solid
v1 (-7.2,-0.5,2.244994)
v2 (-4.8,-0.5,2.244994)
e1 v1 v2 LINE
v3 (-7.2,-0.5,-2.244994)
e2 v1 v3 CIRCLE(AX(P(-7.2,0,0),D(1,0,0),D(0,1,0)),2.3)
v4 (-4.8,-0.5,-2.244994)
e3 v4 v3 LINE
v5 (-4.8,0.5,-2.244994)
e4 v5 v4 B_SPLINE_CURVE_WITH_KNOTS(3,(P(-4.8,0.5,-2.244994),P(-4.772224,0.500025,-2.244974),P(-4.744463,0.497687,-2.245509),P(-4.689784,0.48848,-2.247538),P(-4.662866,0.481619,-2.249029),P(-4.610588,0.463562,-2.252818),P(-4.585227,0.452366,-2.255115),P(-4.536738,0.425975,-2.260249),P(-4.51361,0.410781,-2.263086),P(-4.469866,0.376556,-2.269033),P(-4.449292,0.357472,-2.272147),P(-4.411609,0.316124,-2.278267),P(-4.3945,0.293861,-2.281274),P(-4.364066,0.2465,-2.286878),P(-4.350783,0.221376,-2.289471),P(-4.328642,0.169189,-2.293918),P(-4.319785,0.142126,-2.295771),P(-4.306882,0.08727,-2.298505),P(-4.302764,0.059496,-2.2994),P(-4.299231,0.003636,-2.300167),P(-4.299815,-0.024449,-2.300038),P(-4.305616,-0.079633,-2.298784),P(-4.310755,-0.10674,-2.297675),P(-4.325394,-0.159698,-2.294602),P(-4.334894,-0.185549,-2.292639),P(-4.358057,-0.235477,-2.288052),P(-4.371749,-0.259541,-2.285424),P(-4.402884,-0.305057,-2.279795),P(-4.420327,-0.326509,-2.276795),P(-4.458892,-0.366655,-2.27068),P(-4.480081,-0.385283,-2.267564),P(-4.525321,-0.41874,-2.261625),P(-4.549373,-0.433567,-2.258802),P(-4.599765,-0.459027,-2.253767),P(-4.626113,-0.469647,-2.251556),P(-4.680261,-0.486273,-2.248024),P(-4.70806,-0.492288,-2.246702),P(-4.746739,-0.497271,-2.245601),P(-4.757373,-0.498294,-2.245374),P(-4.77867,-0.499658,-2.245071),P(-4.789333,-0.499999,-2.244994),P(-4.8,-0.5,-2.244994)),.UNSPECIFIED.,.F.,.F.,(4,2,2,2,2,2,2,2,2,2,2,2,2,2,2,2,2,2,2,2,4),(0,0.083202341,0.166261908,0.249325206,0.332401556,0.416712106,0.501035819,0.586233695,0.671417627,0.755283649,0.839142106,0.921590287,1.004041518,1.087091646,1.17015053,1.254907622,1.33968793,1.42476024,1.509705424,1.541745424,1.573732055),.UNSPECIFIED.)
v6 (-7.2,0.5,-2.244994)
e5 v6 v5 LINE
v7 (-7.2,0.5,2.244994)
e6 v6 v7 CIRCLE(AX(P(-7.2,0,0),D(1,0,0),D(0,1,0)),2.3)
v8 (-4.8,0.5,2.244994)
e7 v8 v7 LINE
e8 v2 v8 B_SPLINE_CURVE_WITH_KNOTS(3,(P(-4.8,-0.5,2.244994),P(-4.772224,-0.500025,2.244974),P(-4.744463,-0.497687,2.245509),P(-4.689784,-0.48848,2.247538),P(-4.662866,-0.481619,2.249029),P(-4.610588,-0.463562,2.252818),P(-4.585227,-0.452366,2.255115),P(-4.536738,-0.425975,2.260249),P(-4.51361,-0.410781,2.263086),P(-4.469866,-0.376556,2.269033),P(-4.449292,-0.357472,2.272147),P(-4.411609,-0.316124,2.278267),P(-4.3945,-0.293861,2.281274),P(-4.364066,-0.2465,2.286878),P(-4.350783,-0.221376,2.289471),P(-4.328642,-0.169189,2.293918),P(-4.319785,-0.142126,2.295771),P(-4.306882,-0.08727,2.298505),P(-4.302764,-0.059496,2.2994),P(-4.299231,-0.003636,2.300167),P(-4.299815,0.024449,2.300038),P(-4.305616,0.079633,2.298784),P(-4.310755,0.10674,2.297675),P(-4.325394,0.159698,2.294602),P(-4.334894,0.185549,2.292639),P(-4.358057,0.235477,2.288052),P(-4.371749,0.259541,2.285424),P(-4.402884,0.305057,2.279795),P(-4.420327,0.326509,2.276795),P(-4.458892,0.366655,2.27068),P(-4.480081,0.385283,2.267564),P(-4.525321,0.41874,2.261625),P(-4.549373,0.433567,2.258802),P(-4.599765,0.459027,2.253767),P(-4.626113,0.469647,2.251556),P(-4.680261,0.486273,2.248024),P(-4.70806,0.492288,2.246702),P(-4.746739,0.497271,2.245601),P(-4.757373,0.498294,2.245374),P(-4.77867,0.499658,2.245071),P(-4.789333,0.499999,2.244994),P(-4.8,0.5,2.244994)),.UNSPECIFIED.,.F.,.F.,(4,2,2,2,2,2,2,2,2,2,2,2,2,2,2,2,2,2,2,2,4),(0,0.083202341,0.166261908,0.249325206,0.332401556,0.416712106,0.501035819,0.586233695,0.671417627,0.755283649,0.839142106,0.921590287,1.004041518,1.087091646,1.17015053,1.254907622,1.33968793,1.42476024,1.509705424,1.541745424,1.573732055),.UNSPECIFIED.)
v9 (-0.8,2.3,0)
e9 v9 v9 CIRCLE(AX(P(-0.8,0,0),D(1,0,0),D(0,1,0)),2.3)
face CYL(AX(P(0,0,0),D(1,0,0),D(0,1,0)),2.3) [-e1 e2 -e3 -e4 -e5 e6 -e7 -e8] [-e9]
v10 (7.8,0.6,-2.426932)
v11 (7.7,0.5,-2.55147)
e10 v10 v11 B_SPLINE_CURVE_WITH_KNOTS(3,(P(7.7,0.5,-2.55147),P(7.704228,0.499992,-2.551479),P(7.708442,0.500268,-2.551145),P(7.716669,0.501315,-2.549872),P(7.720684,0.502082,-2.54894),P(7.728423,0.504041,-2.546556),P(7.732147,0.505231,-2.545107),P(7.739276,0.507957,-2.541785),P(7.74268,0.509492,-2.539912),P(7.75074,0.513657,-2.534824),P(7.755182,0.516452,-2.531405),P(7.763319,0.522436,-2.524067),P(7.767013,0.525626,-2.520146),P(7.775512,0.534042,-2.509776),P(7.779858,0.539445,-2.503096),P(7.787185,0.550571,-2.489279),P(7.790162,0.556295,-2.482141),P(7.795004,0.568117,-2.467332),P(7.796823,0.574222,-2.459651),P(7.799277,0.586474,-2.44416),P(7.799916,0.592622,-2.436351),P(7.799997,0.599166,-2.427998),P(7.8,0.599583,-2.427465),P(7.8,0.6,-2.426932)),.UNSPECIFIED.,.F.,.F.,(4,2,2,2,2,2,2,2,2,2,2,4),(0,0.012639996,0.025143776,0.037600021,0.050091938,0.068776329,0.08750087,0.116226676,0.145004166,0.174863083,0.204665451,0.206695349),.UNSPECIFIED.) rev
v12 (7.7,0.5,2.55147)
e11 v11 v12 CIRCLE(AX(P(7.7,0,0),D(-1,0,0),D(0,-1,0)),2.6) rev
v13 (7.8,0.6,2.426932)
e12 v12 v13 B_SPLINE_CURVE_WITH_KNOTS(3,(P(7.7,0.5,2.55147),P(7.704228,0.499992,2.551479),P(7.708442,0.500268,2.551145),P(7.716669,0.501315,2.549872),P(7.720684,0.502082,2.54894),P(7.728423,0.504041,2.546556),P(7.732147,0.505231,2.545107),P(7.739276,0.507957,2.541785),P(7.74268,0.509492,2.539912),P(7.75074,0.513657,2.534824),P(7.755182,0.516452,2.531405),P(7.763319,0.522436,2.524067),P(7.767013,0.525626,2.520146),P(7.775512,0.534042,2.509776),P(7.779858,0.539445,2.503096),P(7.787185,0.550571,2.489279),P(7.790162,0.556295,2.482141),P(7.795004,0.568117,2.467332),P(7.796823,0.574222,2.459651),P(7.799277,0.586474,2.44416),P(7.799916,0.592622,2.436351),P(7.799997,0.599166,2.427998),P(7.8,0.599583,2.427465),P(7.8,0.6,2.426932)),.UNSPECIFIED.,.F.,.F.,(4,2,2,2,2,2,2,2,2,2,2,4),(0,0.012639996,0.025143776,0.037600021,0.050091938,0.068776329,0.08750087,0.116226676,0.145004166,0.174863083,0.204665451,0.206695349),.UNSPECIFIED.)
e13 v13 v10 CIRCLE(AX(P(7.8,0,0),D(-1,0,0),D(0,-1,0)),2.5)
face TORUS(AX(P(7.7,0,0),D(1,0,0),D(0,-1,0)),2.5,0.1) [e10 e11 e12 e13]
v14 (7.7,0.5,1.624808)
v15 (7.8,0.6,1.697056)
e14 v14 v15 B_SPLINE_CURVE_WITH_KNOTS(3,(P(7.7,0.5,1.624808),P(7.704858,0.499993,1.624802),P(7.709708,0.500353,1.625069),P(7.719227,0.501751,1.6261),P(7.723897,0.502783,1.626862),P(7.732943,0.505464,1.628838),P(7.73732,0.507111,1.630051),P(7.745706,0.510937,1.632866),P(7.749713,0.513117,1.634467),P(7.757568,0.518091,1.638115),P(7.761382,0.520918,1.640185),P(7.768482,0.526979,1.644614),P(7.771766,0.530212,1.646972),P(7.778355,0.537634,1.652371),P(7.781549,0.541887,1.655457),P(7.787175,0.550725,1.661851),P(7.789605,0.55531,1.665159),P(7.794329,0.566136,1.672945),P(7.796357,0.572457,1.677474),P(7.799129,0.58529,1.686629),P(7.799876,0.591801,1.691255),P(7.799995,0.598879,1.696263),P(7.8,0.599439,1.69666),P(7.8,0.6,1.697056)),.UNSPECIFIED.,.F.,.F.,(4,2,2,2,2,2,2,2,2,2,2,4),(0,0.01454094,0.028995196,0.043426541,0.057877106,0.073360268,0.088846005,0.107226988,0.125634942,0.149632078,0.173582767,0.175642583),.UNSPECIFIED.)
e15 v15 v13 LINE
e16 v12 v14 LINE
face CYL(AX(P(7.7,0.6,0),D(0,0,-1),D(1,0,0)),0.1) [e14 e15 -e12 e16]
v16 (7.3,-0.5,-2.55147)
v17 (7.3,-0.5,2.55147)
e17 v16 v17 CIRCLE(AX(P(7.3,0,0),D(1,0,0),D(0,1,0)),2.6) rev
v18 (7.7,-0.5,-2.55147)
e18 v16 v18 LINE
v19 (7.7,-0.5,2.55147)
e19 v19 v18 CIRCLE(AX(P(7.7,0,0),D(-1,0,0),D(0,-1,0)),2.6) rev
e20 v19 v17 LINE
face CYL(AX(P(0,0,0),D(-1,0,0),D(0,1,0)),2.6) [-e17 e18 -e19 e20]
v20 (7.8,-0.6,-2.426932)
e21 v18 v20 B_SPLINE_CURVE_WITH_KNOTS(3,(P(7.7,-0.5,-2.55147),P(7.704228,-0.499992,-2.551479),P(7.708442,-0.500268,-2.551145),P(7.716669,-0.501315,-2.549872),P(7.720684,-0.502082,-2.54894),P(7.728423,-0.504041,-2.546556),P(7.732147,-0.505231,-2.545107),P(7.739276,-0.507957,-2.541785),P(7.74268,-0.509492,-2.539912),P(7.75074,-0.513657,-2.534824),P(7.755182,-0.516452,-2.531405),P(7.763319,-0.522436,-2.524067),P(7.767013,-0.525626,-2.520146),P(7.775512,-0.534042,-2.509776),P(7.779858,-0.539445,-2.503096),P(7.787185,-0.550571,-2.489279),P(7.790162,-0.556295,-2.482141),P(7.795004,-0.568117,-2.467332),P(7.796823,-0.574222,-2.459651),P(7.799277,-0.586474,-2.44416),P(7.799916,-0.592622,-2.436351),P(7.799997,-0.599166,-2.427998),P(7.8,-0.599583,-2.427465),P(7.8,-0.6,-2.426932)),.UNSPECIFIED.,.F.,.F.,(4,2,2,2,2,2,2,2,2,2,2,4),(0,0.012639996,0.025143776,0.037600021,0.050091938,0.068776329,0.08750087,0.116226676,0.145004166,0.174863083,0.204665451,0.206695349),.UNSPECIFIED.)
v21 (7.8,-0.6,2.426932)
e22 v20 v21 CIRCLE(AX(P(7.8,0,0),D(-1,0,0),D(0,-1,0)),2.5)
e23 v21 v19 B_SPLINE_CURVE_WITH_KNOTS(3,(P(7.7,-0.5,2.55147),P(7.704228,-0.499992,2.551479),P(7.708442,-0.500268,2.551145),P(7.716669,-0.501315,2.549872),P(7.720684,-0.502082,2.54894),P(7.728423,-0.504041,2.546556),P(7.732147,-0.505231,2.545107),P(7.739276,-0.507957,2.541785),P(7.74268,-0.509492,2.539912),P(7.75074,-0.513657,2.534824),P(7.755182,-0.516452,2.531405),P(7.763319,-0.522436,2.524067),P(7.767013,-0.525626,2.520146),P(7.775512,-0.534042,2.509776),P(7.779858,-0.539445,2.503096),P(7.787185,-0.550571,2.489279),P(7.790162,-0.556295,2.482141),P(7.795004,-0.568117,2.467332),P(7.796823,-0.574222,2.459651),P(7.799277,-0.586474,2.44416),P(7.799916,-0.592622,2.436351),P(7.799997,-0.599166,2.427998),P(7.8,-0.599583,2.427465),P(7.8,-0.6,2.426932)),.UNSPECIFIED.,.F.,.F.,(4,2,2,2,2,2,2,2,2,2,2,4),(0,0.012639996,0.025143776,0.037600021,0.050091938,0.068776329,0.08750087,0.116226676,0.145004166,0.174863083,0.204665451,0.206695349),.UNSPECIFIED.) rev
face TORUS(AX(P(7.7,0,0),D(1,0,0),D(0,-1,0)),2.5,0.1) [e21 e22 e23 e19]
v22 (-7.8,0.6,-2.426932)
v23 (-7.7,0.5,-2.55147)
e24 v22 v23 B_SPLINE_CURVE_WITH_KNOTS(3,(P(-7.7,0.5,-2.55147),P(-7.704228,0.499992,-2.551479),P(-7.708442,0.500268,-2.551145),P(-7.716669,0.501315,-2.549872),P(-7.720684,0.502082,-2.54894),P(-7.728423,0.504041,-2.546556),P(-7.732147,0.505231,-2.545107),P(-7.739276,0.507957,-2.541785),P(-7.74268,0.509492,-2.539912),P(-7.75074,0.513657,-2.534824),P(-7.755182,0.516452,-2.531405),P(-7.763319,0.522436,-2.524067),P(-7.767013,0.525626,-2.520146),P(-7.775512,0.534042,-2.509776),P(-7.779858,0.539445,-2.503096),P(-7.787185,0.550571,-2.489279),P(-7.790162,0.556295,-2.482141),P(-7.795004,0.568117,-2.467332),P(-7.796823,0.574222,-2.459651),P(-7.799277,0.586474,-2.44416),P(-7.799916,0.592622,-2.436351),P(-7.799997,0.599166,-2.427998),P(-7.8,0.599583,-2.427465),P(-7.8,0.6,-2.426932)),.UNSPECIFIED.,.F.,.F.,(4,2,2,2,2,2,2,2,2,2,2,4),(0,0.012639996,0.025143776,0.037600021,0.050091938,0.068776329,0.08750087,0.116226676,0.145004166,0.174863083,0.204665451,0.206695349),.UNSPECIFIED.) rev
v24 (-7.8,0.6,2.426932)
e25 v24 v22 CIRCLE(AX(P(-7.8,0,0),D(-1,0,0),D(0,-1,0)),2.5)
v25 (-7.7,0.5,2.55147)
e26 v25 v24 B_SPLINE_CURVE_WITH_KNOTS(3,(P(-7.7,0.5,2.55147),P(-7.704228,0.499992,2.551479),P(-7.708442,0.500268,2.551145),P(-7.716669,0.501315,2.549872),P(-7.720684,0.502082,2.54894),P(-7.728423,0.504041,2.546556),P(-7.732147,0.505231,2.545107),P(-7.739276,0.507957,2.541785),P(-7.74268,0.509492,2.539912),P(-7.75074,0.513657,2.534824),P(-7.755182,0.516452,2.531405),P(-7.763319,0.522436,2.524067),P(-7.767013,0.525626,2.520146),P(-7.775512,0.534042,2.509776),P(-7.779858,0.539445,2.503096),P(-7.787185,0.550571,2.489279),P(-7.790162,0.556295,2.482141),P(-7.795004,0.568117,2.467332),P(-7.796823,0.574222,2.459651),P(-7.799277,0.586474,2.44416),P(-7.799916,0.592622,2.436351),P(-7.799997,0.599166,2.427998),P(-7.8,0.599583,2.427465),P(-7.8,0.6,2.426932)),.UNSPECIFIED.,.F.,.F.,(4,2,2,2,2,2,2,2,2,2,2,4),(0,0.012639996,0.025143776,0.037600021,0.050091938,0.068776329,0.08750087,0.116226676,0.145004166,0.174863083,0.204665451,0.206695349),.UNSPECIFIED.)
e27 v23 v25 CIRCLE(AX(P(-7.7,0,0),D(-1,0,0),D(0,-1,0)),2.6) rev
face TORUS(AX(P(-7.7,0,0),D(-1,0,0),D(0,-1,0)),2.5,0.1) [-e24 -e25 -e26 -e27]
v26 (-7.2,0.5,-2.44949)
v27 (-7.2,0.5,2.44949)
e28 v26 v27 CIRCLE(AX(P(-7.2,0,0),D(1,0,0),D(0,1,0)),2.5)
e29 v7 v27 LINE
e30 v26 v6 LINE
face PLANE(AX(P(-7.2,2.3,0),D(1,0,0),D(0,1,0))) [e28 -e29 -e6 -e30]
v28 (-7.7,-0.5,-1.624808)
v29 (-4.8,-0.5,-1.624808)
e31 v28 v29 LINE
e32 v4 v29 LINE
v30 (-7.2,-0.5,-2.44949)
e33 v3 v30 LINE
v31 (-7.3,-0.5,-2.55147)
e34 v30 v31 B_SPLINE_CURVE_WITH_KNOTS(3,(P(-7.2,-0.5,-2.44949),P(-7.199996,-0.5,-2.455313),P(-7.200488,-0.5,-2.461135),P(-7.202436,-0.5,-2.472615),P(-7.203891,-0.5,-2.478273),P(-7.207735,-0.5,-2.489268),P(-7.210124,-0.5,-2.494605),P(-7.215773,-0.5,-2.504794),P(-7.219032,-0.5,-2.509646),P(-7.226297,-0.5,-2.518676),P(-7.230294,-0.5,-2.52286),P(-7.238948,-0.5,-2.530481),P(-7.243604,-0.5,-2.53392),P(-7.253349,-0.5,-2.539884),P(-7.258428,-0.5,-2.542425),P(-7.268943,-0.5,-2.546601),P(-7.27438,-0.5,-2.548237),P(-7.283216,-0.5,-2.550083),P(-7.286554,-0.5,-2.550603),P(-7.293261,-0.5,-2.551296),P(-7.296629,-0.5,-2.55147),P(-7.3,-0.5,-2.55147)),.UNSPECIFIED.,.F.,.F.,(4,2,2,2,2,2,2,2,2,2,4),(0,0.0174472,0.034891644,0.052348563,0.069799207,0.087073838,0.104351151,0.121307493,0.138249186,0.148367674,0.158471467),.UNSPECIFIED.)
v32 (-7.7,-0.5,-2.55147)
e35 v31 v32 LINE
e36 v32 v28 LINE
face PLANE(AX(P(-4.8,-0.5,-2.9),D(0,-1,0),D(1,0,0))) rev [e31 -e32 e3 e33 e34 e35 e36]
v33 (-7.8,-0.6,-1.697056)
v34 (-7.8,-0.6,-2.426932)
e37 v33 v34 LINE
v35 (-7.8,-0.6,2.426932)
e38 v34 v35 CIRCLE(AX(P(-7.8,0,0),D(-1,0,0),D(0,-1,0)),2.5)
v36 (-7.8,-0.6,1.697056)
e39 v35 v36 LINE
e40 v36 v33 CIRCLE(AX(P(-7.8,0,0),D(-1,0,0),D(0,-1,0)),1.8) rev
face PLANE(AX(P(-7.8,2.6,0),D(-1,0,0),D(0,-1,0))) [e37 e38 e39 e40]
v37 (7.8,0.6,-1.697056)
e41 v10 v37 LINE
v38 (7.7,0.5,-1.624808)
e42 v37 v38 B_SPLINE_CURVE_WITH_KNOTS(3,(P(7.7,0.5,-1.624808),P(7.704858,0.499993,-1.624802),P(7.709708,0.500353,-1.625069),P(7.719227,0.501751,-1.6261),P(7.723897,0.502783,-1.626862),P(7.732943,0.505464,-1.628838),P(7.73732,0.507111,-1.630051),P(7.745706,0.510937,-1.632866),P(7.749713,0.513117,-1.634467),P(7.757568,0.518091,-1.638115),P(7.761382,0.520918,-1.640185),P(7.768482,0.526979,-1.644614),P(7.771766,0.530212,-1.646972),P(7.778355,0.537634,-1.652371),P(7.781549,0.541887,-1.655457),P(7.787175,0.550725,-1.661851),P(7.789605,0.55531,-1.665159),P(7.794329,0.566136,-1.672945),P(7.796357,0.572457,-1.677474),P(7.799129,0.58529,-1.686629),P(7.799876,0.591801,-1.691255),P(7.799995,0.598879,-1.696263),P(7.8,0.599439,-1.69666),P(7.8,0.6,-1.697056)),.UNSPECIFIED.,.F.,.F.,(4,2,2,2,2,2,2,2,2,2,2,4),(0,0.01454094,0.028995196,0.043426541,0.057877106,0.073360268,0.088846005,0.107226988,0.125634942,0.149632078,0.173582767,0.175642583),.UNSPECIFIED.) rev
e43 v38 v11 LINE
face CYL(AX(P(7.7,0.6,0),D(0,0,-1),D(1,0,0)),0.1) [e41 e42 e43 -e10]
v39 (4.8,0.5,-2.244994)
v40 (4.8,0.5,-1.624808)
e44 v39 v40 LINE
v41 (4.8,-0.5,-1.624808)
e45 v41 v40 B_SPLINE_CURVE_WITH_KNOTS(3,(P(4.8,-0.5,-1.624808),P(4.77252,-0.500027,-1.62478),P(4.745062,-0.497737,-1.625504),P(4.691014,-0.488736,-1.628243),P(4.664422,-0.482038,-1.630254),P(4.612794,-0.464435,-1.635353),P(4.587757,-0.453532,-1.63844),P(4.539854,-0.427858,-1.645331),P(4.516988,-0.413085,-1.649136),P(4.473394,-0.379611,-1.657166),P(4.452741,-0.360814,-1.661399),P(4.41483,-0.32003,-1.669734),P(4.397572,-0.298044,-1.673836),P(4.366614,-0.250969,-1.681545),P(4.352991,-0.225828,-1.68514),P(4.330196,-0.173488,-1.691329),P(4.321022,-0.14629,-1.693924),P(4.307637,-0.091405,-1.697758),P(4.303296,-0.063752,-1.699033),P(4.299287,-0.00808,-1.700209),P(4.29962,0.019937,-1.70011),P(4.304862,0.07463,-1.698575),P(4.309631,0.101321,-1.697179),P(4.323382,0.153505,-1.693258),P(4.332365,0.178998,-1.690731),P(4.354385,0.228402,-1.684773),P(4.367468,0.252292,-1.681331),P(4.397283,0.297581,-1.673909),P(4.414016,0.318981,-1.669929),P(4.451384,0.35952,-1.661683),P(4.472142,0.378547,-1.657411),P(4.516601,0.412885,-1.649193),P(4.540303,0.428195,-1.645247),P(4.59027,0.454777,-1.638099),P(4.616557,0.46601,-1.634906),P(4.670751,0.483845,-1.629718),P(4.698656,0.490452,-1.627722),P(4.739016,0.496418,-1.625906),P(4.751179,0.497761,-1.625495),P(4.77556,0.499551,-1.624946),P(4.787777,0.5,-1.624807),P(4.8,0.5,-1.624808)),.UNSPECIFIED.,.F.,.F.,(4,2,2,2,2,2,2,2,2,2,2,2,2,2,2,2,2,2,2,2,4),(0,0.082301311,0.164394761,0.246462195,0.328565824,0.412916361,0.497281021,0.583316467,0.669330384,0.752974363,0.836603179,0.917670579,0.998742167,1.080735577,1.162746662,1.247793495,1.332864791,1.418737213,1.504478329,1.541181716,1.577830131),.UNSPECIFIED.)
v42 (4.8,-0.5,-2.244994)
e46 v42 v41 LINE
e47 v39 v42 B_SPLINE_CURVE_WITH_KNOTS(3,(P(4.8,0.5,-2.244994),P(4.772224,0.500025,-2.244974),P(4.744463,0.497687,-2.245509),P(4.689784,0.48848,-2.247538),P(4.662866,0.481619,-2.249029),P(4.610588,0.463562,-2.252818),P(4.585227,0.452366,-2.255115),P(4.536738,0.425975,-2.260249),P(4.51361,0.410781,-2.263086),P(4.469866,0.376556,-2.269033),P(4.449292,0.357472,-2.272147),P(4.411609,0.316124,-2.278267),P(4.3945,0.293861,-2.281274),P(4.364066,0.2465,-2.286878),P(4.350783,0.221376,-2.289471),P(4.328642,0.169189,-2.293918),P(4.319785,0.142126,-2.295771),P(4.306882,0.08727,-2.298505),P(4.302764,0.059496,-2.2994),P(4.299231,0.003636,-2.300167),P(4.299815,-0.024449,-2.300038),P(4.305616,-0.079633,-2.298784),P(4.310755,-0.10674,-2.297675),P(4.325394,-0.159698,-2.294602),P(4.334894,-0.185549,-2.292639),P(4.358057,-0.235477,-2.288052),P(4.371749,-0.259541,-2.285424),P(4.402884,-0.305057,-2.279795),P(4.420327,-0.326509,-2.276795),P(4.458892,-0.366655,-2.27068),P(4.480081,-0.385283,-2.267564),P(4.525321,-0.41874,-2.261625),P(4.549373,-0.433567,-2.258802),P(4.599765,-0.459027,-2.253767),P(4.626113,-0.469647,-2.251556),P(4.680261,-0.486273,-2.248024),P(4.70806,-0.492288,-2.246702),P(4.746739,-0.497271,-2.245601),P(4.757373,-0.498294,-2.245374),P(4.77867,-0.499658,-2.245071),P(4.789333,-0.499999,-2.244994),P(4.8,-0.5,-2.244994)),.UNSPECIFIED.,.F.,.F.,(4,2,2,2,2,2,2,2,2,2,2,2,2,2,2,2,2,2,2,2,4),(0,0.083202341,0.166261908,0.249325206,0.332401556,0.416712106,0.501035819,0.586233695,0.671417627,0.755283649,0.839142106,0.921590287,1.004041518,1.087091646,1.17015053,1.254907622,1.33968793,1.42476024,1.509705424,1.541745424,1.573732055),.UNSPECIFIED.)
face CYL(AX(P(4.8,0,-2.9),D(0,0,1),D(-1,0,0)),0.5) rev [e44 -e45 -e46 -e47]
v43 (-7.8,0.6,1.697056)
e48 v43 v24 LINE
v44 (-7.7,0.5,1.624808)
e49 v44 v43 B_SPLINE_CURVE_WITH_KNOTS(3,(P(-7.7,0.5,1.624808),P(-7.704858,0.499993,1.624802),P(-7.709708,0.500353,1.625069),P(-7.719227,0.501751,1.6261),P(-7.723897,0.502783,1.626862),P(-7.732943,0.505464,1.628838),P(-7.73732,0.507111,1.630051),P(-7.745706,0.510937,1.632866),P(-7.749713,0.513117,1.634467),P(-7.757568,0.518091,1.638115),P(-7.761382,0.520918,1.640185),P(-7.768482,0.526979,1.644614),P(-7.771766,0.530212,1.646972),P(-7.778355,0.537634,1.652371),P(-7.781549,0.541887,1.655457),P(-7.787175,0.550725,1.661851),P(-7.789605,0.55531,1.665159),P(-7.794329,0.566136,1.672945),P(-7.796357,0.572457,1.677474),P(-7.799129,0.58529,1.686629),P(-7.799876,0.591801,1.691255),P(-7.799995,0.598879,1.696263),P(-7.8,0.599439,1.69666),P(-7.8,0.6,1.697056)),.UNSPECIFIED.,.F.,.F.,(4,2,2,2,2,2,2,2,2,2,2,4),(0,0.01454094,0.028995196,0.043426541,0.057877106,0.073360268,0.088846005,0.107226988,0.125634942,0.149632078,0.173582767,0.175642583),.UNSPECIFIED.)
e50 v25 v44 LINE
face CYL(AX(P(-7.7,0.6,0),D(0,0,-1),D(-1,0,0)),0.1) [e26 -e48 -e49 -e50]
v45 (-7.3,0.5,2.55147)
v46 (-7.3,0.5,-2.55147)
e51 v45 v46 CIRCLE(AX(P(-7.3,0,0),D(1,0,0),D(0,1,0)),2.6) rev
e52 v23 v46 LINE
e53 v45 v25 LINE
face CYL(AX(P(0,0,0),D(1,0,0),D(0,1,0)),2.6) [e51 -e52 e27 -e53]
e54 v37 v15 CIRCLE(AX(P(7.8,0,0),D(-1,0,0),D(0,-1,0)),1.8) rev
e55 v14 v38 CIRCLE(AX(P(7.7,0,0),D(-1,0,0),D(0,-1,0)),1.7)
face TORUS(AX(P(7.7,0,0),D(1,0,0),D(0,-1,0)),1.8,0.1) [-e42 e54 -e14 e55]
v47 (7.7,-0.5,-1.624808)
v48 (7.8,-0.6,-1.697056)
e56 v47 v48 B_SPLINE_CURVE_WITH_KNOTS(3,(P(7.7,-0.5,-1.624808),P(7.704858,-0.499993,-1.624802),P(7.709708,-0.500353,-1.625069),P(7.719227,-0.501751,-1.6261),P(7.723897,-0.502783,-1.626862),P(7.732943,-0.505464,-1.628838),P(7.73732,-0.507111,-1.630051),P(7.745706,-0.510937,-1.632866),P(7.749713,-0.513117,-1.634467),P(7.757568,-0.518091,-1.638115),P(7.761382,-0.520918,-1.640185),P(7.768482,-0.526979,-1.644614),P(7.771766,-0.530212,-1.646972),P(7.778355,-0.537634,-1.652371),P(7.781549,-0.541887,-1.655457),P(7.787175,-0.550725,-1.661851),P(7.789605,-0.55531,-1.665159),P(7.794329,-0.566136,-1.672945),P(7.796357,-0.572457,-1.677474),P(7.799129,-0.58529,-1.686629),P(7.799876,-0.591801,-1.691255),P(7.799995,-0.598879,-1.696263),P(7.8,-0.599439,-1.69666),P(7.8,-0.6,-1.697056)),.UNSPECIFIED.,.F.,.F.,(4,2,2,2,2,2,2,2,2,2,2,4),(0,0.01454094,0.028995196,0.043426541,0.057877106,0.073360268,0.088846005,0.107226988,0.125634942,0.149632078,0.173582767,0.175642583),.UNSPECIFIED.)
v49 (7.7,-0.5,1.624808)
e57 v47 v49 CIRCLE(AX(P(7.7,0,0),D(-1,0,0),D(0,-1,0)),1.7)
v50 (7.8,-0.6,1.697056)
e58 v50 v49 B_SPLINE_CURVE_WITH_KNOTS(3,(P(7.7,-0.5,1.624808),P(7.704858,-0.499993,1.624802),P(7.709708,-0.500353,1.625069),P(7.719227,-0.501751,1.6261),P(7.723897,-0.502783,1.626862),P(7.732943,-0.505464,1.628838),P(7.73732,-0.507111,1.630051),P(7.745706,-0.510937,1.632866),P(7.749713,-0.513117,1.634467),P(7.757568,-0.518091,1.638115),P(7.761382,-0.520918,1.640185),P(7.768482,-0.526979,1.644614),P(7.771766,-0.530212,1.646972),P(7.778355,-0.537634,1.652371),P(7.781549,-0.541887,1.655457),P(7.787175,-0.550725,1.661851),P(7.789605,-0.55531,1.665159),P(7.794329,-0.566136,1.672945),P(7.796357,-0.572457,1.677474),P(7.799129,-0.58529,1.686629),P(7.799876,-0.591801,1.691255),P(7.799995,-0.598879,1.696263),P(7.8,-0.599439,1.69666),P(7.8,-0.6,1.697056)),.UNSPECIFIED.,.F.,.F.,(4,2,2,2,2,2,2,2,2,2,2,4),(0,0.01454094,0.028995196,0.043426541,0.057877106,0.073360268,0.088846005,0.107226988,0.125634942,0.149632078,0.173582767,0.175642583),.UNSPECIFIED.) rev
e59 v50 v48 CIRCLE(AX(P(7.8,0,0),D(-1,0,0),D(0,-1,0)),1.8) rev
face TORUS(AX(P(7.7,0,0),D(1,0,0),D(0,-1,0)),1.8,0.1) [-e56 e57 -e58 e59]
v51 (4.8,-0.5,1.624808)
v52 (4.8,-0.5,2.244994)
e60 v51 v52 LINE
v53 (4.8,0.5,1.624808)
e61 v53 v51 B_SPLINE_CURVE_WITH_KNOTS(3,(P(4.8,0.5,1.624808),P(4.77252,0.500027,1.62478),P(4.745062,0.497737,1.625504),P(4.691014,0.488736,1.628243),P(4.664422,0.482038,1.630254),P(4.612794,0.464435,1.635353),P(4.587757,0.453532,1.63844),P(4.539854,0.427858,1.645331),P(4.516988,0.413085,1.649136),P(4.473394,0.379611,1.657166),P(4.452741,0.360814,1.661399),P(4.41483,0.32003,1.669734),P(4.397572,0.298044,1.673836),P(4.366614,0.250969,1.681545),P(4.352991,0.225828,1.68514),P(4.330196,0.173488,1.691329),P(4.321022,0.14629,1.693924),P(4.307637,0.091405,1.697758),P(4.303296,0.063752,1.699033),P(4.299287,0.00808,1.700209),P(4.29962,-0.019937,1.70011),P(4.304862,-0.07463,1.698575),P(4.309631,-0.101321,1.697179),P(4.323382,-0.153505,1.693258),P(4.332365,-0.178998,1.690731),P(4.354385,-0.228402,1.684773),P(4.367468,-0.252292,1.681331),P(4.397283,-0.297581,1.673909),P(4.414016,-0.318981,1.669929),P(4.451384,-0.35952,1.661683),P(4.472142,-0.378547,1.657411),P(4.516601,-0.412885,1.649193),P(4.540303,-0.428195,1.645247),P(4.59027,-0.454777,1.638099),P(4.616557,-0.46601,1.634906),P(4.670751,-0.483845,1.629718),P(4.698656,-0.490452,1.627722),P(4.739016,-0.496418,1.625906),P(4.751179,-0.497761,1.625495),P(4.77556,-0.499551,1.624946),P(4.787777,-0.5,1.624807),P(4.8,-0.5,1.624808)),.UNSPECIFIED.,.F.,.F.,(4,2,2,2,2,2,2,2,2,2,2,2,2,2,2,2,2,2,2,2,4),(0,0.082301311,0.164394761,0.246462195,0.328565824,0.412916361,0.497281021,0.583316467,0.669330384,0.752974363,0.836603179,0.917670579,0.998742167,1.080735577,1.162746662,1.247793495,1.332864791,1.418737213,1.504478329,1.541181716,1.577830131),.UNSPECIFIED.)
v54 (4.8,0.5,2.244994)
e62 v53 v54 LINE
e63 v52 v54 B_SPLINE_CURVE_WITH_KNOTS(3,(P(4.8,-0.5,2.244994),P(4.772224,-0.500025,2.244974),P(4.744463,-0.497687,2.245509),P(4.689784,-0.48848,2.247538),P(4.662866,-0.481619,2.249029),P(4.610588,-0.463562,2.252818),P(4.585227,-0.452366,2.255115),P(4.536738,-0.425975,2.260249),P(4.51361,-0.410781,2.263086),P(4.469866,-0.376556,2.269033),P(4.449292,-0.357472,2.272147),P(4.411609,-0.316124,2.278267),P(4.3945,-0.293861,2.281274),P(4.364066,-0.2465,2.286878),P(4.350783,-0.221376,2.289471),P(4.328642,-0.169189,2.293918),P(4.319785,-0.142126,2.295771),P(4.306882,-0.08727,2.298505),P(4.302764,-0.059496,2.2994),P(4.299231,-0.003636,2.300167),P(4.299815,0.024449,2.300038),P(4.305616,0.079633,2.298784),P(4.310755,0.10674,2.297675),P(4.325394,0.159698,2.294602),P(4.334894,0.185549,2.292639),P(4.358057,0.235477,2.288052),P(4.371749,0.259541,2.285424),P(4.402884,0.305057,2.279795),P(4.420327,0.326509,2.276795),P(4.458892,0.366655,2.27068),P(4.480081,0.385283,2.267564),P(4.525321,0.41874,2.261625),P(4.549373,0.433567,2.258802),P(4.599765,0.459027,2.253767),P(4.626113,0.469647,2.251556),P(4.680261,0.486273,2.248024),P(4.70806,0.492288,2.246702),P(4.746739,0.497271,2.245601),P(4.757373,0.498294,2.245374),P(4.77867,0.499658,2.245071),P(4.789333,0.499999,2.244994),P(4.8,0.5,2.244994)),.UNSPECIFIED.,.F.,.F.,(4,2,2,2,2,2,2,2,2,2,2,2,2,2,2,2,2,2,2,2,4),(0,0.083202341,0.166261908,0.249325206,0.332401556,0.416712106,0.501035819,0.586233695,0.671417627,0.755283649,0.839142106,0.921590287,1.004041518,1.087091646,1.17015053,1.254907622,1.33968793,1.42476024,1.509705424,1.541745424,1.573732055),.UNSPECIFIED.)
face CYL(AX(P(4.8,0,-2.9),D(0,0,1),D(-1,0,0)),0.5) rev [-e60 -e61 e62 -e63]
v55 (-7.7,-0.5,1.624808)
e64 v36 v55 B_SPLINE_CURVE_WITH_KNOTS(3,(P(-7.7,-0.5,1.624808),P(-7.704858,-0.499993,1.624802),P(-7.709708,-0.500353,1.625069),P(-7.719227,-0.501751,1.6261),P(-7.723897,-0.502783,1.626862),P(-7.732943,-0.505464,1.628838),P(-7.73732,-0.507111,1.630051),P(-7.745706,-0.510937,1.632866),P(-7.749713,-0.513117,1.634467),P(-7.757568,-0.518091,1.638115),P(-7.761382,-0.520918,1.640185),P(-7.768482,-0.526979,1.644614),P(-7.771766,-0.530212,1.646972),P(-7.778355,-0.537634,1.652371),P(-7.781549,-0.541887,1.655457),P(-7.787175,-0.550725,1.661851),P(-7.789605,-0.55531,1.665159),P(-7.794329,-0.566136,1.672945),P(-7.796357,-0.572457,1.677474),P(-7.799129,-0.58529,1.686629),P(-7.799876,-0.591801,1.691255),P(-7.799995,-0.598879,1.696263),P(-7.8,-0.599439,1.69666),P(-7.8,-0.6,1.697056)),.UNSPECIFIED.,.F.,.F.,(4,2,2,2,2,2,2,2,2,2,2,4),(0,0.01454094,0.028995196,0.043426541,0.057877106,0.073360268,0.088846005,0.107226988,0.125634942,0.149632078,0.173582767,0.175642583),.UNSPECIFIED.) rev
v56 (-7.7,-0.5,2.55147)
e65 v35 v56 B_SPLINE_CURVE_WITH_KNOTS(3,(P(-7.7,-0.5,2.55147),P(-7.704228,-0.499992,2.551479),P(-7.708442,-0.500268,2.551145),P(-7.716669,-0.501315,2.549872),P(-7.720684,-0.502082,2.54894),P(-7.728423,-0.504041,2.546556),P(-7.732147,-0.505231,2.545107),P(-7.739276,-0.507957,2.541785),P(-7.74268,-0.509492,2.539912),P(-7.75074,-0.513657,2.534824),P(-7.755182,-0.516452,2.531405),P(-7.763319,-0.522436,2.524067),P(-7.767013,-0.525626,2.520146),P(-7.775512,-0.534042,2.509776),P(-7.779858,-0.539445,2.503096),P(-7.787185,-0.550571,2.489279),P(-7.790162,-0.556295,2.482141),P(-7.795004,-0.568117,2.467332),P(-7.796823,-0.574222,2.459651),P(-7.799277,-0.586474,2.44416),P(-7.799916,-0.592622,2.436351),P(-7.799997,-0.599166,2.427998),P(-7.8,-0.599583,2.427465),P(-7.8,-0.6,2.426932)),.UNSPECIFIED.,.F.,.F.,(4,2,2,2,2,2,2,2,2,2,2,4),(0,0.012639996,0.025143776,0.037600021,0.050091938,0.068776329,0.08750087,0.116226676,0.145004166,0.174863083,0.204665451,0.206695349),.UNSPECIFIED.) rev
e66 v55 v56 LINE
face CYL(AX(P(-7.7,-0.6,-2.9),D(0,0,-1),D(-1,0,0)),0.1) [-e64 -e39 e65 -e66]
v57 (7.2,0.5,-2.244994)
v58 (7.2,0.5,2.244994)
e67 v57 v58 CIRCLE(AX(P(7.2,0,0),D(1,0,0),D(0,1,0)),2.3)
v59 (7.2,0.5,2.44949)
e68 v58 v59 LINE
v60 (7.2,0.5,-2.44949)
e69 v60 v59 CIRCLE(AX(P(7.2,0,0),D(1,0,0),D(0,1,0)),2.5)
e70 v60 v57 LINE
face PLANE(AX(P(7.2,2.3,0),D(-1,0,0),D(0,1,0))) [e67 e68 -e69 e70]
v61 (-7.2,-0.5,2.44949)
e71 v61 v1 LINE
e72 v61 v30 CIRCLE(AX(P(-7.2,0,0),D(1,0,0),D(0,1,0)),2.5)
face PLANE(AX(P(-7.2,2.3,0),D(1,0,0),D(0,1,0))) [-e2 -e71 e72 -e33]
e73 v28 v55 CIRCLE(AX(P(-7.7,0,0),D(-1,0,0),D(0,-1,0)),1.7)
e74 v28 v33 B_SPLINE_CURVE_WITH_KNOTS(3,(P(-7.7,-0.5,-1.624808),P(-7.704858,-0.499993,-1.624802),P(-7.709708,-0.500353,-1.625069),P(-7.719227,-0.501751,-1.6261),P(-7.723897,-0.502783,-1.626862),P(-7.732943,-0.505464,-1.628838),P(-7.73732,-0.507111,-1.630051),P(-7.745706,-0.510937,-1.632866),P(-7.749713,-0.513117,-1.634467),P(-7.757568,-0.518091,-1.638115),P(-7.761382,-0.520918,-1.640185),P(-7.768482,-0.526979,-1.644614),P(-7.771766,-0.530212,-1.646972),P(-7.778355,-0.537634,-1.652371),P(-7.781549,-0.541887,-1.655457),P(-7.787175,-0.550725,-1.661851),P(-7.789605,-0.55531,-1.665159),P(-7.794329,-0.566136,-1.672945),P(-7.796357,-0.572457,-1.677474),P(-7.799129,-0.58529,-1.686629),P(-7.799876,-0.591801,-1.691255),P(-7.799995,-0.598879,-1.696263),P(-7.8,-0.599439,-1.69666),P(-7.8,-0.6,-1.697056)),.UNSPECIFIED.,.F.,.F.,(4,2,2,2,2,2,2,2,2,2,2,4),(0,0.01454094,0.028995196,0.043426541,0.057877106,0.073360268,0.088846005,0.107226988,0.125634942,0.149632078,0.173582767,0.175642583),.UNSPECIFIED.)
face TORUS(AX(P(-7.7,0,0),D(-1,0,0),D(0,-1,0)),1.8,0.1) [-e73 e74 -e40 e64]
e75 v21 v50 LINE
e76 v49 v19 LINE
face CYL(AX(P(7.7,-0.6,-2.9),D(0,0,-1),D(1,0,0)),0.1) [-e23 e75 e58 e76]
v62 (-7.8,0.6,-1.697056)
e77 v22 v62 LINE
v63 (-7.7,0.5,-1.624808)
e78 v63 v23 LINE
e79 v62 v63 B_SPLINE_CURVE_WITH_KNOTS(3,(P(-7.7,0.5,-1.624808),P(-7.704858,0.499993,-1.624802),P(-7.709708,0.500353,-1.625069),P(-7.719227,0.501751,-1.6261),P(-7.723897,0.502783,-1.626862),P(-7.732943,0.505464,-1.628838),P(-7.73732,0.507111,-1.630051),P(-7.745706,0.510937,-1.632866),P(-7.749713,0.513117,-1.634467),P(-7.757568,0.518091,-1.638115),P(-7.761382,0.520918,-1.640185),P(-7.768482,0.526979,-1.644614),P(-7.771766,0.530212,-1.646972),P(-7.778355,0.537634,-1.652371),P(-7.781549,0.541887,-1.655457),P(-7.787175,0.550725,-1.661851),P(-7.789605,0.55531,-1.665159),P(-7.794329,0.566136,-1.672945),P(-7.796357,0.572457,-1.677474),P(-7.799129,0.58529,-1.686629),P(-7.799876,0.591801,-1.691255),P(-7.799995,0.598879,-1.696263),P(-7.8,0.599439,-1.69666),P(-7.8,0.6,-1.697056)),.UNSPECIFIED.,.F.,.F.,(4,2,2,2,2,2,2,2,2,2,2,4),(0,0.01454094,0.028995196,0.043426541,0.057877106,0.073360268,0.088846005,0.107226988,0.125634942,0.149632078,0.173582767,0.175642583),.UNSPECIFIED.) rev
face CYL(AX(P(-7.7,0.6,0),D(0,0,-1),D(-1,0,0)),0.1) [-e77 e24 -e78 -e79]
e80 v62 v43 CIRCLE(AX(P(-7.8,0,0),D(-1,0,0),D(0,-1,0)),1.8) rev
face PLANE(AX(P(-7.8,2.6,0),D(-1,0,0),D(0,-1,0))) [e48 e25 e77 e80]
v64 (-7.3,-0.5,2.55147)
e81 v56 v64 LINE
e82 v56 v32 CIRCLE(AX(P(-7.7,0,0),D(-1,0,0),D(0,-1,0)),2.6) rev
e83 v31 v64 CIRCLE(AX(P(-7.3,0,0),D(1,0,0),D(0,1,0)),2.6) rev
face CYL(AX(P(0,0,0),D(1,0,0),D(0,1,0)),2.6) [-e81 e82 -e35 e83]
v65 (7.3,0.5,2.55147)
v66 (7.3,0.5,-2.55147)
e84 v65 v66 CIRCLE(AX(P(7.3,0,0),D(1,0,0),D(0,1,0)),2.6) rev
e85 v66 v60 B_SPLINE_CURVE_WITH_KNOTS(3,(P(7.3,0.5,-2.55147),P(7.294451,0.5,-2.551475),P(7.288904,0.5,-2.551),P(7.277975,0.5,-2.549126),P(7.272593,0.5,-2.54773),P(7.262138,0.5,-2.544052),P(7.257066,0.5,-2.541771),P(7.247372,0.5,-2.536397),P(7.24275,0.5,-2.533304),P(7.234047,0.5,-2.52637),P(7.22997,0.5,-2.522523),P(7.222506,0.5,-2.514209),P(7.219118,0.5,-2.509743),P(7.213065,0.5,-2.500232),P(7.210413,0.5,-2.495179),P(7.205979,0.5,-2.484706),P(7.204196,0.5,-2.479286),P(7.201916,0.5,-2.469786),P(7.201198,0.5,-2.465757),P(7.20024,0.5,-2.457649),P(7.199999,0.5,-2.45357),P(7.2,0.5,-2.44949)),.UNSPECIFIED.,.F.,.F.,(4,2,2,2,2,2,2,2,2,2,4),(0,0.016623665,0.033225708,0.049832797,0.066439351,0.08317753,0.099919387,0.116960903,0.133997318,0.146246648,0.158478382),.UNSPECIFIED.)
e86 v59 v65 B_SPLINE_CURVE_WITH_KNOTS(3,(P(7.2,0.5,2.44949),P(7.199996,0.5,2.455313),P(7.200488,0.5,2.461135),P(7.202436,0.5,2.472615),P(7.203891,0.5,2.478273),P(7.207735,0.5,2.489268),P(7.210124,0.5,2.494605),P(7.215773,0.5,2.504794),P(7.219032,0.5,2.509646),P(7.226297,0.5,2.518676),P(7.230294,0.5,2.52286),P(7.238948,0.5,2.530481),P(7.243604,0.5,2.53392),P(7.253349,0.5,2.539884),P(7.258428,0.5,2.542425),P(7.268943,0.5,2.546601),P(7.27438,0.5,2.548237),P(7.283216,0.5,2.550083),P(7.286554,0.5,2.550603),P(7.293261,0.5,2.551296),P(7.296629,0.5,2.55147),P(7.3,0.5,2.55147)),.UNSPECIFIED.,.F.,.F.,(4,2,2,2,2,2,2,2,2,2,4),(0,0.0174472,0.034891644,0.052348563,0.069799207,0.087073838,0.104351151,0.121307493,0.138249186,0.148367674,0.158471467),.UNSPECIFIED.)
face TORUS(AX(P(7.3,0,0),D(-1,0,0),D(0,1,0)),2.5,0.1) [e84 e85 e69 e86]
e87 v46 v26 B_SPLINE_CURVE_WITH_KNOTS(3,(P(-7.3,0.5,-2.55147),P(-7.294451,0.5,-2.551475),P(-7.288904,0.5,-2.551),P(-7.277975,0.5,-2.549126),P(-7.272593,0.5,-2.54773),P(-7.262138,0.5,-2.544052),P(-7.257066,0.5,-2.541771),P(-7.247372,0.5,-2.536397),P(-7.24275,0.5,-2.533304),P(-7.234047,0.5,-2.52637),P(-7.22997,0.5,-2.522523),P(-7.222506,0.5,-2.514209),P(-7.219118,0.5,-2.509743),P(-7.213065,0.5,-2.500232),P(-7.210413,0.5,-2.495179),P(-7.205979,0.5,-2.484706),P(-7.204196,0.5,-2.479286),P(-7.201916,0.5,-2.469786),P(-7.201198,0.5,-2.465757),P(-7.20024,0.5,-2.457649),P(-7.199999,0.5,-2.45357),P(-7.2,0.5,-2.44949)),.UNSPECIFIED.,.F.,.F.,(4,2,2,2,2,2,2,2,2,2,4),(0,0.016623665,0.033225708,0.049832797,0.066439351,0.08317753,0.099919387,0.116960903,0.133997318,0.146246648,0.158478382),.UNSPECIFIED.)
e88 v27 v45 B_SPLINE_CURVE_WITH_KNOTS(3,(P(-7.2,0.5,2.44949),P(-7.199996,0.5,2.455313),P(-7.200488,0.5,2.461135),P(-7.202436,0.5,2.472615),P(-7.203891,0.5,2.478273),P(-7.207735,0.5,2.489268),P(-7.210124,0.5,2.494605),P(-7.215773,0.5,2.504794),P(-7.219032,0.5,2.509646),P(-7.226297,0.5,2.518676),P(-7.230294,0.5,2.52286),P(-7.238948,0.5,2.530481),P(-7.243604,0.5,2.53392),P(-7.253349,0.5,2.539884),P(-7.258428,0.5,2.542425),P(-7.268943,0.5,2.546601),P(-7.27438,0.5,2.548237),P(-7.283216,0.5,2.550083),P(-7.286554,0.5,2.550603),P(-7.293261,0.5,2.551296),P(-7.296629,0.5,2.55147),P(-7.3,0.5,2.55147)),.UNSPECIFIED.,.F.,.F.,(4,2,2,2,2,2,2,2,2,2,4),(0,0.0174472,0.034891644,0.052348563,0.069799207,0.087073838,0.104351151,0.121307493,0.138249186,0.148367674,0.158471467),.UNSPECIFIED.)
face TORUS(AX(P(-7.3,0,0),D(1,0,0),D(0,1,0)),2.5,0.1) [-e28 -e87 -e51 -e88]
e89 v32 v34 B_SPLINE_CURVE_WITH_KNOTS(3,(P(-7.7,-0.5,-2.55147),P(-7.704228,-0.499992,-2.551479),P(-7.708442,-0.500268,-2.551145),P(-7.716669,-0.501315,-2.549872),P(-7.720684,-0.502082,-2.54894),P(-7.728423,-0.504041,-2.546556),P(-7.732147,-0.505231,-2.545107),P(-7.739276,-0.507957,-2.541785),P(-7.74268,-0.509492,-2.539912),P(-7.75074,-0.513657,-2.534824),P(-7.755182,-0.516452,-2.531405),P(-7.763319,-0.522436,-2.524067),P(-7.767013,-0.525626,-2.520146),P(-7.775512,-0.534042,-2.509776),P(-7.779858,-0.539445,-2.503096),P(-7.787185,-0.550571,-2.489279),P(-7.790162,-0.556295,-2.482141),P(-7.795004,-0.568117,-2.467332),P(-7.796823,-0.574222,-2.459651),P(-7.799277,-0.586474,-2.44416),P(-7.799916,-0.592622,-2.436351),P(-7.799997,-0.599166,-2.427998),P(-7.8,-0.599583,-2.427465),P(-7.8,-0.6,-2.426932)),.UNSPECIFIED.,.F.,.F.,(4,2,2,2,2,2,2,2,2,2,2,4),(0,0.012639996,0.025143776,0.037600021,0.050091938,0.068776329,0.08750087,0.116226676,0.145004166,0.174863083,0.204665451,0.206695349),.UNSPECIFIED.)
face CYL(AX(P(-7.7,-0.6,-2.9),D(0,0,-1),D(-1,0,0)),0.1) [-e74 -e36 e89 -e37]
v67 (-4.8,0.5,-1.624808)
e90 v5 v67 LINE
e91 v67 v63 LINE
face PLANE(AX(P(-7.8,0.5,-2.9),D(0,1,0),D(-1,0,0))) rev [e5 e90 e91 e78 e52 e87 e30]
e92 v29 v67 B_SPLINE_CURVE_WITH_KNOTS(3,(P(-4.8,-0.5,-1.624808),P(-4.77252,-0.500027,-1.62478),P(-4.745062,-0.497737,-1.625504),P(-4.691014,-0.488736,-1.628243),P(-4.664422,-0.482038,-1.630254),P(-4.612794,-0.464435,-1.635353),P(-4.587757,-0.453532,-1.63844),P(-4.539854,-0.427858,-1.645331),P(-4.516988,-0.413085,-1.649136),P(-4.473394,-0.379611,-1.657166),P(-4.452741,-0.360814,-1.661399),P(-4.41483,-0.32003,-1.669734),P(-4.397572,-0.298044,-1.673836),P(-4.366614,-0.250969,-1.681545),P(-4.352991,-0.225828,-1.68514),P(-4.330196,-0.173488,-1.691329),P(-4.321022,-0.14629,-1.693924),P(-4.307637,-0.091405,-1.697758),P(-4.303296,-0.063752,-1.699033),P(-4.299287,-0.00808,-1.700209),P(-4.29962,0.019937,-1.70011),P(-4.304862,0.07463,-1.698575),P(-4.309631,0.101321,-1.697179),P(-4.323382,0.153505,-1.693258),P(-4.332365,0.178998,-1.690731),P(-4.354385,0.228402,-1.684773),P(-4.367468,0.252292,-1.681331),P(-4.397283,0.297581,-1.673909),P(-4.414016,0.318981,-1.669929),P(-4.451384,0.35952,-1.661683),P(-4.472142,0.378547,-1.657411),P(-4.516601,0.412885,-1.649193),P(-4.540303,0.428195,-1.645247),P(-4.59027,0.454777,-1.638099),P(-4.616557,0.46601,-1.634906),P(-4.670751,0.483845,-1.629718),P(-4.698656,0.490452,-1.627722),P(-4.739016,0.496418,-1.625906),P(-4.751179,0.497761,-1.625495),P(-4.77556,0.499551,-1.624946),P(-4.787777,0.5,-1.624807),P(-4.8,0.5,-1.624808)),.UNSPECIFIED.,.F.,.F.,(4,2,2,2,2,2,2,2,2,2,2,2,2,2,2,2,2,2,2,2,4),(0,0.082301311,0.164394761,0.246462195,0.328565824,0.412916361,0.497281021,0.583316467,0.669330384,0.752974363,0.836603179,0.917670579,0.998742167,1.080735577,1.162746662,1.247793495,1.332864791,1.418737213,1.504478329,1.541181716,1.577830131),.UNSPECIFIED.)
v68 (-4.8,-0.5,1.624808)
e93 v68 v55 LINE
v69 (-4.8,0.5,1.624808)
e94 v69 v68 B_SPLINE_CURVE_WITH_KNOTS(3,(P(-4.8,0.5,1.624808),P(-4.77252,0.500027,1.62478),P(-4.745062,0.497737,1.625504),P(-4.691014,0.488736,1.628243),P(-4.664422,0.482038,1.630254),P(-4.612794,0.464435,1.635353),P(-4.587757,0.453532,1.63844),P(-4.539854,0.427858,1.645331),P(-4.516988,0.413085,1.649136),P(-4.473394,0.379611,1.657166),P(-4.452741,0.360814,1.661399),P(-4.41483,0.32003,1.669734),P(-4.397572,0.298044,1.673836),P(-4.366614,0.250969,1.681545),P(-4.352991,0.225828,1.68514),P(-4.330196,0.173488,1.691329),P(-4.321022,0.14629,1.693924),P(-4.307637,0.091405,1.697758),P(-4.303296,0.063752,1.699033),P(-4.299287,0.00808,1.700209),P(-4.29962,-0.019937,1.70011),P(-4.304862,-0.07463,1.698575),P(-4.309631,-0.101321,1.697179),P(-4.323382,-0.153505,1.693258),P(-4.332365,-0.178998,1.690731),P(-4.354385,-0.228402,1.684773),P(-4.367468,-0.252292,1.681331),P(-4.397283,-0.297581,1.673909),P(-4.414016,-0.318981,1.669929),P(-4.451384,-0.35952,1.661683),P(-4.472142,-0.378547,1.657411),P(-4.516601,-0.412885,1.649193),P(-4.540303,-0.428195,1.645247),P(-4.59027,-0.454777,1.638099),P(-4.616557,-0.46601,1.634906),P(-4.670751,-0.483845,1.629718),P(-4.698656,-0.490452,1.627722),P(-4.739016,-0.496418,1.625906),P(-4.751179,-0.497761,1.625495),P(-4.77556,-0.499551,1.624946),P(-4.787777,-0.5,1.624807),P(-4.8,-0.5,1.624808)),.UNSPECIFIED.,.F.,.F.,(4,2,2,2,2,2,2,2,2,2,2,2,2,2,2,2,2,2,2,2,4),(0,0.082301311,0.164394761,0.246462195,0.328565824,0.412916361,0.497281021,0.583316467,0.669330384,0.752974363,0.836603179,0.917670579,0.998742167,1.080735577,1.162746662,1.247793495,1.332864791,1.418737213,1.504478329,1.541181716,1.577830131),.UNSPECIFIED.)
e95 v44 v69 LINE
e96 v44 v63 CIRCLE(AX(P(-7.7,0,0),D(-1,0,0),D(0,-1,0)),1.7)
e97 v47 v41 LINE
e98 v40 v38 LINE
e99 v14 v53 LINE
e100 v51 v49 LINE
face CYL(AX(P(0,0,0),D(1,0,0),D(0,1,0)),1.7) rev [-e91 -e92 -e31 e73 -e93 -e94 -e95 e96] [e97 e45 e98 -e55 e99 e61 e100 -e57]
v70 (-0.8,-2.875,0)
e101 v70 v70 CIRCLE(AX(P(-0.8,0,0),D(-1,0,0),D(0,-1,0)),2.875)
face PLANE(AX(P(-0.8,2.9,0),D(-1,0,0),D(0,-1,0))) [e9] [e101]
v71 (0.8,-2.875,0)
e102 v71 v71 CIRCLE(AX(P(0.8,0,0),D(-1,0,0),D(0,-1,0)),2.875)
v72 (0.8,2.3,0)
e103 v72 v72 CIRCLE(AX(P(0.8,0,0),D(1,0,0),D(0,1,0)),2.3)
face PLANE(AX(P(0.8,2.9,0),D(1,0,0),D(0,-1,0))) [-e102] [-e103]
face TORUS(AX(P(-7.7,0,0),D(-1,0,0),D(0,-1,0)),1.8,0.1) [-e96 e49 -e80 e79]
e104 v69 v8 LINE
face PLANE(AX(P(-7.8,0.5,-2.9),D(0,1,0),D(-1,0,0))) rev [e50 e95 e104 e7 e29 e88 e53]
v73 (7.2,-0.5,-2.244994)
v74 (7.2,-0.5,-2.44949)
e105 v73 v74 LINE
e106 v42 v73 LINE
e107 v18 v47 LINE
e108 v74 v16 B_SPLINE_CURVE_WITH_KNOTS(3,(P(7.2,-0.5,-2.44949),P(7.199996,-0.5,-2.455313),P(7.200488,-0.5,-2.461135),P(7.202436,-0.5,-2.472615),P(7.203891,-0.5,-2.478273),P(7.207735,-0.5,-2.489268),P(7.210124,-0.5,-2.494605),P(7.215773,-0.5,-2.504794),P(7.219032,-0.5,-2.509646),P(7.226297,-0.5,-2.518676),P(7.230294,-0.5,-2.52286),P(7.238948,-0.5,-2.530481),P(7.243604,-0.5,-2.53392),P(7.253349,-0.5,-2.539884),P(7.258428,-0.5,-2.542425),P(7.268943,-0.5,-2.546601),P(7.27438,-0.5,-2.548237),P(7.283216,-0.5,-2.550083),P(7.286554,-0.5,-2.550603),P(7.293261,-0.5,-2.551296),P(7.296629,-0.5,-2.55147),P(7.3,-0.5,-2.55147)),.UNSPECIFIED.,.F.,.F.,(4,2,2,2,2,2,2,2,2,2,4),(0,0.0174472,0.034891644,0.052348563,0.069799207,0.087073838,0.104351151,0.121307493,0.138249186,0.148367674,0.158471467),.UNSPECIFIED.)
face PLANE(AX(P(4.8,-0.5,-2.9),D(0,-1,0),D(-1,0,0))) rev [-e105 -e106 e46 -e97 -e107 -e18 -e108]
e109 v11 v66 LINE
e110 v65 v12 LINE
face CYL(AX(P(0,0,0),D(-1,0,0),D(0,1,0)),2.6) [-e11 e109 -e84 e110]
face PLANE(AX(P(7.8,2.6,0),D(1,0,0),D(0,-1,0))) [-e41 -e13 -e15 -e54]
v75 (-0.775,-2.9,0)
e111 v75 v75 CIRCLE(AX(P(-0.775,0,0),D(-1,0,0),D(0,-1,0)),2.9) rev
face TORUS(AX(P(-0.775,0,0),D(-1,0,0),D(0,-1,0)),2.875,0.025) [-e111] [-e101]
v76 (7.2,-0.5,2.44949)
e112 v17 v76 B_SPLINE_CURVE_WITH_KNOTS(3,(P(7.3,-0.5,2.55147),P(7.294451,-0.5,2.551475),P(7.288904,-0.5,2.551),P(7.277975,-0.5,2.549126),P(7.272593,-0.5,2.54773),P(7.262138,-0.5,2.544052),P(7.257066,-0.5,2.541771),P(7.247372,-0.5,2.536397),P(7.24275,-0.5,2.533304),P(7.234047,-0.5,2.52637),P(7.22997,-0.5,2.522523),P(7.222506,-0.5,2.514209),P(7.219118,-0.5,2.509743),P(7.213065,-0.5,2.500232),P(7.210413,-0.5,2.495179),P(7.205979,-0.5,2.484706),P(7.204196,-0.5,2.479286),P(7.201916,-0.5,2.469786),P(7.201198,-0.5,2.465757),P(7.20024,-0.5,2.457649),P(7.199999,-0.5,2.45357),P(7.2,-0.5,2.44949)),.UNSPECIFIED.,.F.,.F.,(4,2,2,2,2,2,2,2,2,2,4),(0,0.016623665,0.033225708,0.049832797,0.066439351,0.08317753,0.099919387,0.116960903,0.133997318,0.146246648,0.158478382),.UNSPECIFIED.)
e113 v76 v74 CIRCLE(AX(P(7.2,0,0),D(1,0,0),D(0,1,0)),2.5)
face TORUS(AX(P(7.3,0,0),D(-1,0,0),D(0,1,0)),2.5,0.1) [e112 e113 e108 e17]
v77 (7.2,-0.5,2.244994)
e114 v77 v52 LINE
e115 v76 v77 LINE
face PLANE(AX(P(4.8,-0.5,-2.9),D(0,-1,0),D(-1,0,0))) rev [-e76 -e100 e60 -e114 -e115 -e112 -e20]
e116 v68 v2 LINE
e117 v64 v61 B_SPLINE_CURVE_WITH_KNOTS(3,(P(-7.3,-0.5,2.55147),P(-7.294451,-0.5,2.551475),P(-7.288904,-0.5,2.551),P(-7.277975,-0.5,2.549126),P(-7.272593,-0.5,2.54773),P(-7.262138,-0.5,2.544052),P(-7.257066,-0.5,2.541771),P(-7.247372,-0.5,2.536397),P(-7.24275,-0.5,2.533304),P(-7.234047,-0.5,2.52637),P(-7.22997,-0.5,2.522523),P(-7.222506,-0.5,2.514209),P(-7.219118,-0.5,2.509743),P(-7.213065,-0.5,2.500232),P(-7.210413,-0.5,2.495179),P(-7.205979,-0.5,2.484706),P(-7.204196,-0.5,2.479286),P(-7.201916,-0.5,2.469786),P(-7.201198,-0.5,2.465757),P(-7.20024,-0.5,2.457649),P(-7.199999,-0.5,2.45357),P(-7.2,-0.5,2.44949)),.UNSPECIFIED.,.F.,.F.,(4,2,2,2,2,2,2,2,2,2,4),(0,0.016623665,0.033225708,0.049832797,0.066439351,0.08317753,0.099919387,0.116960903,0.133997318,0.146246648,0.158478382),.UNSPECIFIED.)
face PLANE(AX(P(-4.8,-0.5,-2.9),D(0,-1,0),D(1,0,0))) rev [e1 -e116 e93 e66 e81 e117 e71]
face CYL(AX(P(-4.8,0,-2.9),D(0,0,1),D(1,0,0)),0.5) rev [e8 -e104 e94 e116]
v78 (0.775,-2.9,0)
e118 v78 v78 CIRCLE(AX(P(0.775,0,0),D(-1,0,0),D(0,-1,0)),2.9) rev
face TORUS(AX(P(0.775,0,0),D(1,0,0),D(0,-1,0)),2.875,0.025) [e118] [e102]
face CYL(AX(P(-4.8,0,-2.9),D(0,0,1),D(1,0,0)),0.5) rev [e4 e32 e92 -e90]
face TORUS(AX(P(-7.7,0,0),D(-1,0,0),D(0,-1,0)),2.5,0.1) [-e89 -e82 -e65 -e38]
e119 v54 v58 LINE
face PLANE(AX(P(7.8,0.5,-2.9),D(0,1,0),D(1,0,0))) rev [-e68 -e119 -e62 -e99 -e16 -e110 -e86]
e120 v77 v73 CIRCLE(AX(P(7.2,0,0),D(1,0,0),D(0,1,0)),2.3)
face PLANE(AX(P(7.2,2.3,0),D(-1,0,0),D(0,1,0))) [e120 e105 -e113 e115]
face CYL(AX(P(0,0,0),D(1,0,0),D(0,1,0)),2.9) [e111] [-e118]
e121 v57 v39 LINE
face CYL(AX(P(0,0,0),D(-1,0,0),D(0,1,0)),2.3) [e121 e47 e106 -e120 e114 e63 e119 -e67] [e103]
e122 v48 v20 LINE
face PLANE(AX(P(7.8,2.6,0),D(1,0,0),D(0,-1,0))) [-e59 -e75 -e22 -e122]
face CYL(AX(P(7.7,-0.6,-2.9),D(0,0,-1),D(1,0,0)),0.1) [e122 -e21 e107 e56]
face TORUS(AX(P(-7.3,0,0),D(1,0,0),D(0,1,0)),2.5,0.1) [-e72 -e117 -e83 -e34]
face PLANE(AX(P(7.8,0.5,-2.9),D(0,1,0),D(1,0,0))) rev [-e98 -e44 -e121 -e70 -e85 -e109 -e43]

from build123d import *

# Parameters (mm, degrees)
CUT_EXTRUDE1_DEPTH      = 9.812491135
CUT_EXTRUDE1_DEPTH_BACK = 9.812491135
FILLET3_R               = 0.1
FILLET5_R               = 0.025
FILLET7_R               = 0.1


with BuildPart() as part:
    # Sketch1 → Revolve1 (revolve)
    with BuildSketch(Plane.XY):
        Polygon((0, 1.7), (0, 2.9), (-0.8, 2.9), (-0.8, 2.3), (-7.2, 2.3), (-7.2, 2.6), (-7.8, 2.6), (-7.8, 1.7), align=None)
    revolve(axis=Axis((0, 0, 0), (-1, 0, 0)))

    # Sketch2 → Cut-Extrude1 (cut, two sides: drawn at the far end of the back side and taken through both)
    with BuildSketch(Plane.XY.offset(-CUT_EXTRUDE1_DEPTH_BACK)):
        with BuildLine():
            Line((-7.8, 0.5), (-4.8, 0.5))
            ThreePointArc((-4.8, 0.5), (-4.3, 0), (-4.8, -0.5))
            Line((-4.8, -0.5), (-7.8, -0.5))
            Line((-7.8, -0.5), (-7.8, 0.5))
        make_face()
    extrude(amount=CUT_EXTRUDE1_DEPTH + CUT_EXTRUDE1_DEPTH_BACK, mode=Mode.SUBTRACT)

    # Fillet3
    fillet3_edges = [part.edges().sort_by_distance(p)[0] for p in [
        (-7.8, -1.7, 0),
        (-7.8, 1.367479433, 1.009950494),
        (-7.8, -2.6, 0),
        (-7.8, 2.6, 0),
        (-7.8, -0.5, -2.088138923),
        (-7.8, 0.5, 2.088138923),
        (-7.8, -0.5, 2.088138923),
        (-7.8, 0.5, -2.088138923),
    ]]
    fillet(fillet3_edges, radius=FILLET3_R - 0.0001)  # a hair under: the kernel refuses the full size

    # Fillet5
    fillet5_edges = [part.edges().sort_by_distance(p)[0] for p in [
        (-0.8, -2.9, 0),
    ]]
    fillet(fillet5_edges, radius=FILLET5_R)

    # Fillet7
    fillet7_edges = [part.edges().sort_by_distance(p)[0] for p in [
        (-7.2, -2.6, 0),
        (-7.2, 2.6, 0),
    ]]
    fillet(fillet7_edges, radius=FILLET7_R)

    # Mirror1: part across plane


with BuildPart() as part_1:
    add(part.part)
    add(part.part.mirror(Plane(origin=(0, 1.7, 0), x_dir=(0, 0, 1), z_dir=(1, 0, 0))))


solid = part_1.part
